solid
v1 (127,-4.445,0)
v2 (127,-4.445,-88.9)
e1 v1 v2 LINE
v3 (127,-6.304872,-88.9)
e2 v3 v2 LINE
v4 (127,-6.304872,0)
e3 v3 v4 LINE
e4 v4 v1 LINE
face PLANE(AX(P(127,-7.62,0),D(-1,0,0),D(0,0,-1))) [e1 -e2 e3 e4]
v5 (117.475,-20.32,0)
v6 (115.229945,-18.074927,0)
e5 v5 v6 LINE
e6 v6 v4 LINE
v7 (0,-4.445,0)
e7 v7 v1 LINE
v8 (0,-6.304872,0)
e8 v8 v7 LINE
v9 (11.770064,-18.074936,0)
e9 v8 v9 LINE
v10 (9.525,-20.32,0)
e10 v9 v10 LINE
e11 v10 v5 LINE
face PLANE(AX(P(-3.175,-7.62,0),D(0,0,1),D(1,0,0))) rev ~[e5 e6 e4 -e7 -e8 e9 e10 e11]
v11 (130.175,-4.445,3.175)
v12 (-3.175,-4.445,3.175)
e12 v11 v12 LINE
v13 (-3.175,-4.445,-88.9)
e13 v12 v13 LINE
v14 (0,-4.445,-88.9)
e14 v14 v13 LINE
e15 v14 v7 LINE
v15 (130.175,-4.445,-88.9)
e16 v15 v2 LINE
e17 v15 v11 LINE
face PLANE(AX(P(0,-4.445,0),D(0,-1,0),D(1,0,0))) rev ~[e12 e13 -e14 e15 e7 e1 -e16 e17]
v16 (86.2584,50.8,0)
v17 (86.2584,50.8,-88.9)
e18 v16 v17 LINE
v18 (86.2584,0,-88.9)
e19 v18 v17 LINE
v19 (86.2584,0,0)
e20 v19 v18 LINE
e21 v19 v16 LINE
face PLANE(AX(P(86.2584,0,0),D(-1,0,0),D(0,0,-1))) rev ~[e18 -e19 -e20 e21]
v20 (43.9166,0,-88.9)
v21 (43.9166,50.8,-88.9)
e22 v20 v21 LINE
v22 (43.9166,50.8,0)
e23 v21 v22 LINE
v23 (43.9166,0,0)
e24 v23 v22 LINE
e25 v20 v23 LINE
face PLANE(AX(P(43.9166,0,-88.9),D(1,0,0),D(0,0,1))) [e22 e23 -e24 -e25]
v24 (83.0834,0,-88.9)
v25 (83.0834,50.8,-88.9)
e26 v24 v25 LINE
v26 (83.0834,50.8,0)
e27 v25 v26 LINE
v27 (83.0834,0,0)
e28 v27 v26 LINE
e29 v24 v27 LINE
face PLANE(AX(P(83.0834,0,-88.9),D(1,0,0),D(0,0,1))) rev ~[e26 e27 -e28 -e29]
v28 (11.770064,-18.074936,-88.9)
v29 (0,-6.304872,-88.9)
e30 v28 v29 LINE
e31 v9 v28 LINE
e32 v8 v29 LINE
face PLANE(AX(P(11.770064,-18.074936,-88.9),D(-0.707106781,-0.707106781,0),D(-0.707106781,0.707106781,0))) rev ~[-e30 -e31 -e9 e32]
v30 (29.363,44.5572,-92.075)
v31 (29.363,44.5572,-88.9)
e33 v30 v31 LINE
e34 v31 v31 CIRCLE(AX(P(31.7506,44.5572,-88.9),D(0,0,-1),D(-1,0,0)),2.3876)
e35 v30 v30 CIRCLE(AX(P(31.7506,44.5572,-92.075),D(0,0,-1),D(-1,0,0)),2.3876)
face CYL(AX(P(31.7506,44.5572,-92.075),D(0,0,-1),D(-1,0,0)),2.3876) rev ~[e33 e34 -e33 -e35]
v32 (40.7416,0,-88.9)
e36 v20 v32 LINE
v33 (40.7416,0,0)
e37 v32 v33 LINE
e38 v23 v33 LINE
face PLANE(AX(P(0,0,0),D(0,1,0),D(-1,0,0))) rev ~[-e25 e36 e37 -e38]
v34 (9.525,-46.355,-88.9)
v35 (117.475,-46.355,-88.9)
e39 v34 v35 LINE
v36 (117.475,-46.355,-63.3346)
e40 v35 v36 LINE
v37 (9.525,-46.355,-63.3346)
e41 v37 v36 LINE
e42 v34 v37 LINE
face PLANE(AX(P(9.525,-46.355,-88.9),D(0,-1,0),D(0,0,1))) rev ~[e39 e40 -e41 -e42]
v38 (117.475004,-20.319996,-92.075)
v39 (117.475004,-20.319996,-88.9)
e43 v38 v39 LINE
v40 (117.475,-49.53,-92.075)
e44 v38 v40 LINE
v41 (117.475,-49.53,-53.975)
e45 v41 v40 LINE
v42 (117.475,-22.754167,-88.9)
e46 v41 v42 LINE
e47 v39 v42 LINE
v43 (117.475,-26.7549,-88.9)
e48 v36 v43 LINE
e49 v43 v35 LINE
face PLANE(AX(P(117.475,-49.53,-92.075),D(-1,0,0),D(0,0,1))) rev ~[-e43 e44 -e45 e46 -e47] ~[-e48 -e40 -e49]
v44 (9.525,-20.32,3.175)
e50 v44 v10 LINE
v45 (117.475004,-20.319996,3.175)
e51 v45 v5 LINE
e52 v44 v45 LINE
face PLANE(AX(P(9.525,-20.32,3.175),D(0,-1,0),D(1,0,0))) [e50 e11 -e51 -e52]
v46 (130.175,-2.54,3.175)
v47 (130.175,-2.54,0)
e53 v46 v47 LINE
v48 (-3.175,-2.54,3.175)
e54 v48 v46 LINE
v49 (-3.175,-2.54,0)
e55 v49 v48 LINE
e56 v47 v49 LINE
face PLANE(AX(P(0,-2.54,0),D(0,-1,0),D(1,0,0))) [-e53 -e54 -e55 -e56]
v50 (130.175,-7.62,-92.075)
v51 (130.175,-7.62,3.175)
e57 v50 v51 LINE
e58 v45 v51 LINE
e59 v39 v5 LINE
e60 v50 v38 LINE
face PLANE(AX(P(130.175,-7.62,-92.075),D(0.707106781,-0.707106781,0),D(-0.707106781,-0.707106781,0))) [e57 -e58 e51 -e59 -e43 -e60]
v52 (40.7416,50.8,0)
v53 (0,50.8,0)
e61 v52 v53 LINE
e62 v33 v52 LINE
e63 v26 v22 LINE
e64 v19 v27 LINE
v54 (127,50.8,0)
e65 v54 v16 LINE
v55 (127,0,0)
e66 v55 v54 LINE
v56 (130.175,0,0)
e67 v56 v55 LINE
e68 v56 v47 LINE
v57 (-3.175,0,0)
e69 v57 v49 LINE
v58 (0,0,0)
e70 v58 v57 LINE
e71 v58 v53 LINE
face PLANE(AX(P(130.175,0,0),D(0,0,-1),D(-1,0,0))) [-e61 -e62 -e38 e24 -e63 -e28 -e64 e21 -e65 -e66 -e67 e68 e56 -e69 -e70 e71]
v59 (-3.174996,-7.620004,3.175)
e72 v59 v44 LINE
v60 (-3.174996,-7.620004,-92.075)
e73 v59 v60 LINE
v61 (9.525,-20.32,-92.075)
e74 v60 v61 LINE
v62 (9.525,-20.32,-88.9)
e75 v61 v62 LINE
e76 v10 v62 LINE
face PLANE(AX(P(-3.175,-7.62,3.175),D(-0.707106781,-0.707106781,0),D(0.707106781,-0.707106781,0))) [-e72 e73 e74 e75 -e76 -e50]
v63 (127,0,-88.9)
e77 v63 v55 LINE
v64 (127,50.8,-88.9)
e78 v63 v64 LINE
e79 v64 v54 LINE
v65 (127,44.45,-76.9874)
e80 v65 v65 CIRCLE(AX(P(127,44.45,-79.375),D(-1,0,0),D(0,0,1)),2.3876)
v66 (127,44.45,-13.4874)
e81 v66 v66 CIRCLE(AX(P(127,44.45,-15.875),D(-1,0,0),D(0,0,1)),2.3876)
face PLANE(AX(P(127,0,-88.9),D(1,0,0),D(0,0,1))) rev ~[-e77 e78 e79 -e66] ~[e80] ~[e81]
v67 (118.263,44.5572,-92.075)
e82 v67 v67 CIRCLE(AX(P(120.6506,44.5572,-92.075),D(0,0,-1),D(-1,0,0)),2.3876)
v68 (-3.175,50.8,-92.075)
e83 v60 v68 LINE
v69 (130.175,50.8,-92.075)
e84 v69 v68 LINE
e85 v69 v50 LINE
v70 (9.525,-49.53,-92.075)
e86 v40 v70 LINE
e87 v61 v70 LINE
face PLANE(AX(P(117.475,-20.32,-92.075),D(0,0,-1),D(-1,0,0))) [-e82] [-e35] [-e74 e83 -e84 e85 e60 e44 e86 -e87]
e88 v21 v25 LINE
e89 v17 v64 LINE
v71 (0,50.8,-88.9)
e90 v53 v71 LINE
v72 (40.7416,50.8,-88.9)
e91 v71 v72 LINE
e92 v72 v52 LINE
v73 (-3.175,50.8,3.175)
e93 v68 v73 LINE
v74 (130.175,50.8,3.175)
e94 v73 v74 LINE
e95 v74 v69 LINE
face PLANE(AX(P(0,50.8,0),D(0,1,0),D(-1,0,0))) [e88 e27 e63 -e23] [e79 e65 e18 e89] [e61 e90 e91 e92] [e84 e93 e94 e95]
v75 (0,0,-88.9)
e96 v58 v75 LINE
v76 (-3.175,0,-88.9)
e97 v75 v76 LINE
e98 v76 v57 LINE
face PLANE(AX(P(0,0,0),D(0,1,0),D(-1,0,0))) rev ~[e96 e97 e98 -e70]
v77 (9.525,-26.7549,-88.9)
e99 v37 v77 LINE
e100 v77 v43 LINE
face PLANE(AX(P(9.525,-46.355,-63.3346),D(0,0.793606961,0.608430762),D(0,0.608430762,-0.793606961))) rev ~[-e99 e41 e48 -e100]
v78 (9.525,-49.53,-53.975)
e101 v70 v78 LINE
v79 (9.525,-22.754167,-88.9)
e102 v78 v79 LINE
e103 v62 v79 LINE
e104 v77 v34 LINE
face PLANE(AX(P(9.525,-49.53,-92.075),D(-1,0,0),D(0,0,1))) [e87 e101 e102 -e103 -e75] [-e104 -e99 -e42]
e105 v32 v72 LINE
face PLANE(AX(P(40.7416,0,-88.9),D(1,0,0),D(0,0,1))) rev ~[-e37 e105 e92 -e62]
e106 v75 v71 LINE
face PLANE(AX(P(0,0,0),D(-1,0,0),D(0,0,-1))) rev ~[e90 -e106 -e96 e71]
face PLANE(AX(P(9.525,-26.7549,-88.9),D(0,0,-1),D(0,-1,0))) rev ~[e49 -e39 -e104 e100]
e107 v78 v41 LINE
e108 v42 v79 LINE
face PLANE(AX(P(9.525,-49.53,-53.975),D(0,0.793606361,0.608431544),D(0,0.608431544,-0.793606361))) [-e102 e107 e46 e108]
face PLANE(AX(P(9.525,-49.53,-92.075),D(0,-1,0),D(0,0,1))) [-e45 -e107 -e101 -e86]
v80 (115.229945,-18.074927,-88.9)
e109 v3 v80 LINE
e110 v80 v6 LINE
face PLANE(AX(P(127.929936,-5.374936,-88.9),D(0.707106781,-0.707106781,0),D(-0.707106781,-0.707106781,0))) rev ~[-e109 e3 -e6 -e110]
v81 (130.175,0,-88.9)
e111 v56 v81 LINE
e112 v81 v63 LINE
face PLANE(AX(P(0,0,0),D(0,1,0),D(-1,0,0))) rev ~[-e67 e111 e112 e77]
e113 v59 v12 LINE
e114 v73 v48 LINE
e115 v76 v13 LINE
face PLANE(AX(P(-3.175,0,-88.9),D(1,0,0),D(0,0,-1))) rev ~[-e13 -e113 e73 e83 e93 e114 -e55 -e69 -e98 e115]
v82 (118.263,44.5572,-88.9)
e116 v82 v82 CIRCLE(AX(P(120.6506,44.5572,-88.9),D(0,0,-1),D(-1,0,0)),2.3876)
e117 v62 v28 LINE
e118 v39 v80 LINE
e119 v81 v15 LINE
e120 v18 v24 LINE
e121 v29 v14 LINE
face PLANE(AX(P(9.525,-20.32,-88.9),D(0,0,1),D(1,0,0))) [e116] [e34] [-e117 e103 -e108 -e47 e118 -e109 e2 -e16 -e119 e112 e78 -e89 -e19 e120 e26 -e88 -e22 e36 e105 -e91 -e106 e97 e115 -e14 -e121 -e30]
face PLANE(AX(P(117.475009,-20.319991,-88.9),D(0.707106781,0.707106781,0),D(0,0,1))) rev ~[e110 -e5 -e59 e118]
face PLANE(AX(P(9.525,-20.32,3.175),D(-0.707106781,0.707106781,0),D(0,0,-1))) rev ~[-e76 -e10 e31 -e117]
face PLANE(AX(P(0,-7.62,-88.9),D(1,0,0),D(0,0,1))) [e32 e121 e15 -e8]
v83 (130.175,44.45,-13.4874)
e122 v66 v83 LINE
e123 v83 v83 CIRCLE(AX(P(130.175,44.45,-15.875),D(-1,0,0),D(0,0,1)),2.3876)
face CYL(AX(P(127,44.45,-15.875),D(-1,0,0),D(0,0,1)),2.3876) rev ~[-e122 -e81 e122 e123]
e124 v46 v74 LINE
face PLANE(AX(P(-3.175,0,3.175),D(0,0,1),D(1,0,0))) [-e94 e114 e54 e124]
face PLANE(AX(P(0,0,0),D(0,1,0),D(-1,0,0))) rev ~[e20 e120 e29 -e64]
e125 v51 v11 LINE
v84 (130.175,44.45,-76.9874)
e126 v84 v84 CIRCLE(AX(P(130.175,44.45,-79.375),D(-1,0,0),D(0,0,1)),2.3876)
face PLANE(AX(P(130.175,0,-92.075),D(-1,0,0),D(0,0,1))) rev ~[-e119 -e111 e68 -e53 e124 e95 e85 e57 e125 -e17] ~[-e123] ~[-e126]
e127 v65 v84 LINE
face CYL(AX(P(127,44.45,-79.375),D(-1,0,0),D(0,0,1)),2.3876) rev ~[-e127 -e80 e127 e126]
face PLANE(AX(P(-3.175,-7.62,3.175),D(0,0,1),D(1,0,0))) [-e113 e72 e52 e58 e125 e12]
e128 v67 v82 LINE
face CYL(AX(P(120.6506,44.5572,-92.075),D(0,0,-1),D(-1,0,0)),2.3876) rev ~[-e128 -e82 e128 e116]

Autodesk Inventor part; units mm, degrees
ref_plane "YZ Plane" through (0, 0, 0) normal (1, 0, 0) x (0, 1, 0)
ref_plane "XZ Plane" through (0, 0, 0) normal (0, 1, 0) x (-1, 0, 0)
ref_plane "XY Plane" through (0, 0, 0) normal (0, 0, 1) x (1, 0, 0)
sketch "Sketch1" plane through (0, 0, 0) normal (0, 1, 0) x (-1, 0, 0)
  line L0 (0, 0) -> (0, -88.9)
  line L1 (0, -88.9) -> (-127, -88.9)
  line L2 (-127, -88.9) -> (-127, 0)
  line L3 (-127, 0) -> (0, 0)
  line L4 (3.175, -92.075) -> (3.175, 3.175)
  line L5 (3.175, 3.175) -> (-130.175, 3.175)
  line L6 (-130.175, 3.175) -> (-130.175, -92.075)
  line L7 (-130.175, -92.075) -> (3.175, -92.075)
  line L8 (0, 0) -> (0, -88.9)
  line L9 (0, -88.9) -> (-40.7416, -88.9)
  line L10 (-40.7416, -88.9) -> (-40.7416, 0)
  line L11 (-40.7416, 0) -> (0, 0)
  line L12 (-40.7416, 0) -> (-40.7416, -88.9)
  line L13 (-40.7416, -88.9) -> (-43.9166, -88.9)
  line L14 (-43.9166, -88.9) -> (-43.9166, 0)
  line L15 (-43.9166, 0) -> (-40.7416, 0)
  line L16 (-127, -88.9) -> (-127, 0)
  line L17 (-127, 0) -> (-86.2584, 0)
  line L18 (-86.2584, 0) -> (-86.2584, -88.9)
  line L19 (-86.2584, -88.9) -> (-127, -88.9)
  line L20 (-86.2584, 0) -> (-86.2584, -88.9)
  line L21 (-86.2584, -88.9) -> (-83.0834, -88.9)
  line L22 (-83.0834, -88.9) -> (-83.0834, 0)
  line L23 (-83.0834, 0) -> (-86.2584, 0)
  dimension "d0" = 88.9
  dimension "d1" = 127
  dimension "d2" = 3.175
  dimension "d3" = 40.7416
  dimension "d4" = 3.175
  dimension "d5" = 40.7416
  dimension "d6" = 3.175
extrude "Extrusion1" add sketch "Sketch1" along normal blind 50.8 contours L10 L1 L14 L3 | L22 L1 L18 L3 | L7 L6 L5 L4
sketch "Sketch2" plane through (0, 0, 0) normal (0, -1, 0) x (1, 0, 0)
  line L0 (-3.175, 3.175) -> (130.175, 3.175) projected
  line L1 (-3.175, 3.175) -> (130.175, 3.175)
  line L2 (130.175, 3.175) -> (130.175, 0)
  line L3 (130.175, 0) -> (-3.175, 0)
  line L4 (-3.175, 0) -> (-3.175, 3.175)
  point P0 (0, 0)
extrude "Extrusion2" add sketch "Sketch2" along normal blind 2.54
sketch "Sketch3" plane through (0, 0, 0) normal (0, -1, 0) x (1, 0, 0)
  line L0 (130.175, -92.075) -> (-3.175, -92.075) projected
  line L1 (-3.175, -92.075) -> (130.175, -92.075)
  line L2 (130.175, -92.075) -> (130.175, -88.9)
  line L3 (130.175, -88.9) -> (-3.175, -88.9)
  line L4 (-3.175, -88.9) -> (-3.175, -92.075)
  point P0 (0, 0)
  dimension "d11" = 3.175
extrude "Extrusion3" add sketch "Sketch3" along normal blind 7.62
sketch "Sketch4" plane through (0, -7.62, 0) normal (0, -1, 0) x (1, 0, 0)
  line L0 (130.175, -92.075) -> (-3.175, -92.075) projected
  line L1 (-3.175, -92.075) -> (130.175, -92.075)
  line L2 (130.175, -92.075) -> (130.175, 3.175)
  line L3 (130.175, 3.175) -> (-3.175, 3.175)
  line L4 (-3.175, 3.175) -> (-3.175, -92.075)
  line L5 (0, 0) -> (127, 0)
  line L6 (127, 0) -> (127, -88.9)
  line L7 (127, -88.9) -> (0, -88.9)
  line L8 (0, -88.9) -> (0, 0)
  point P0 (0, 0)
extrude "Extrusion4" add sketch "Sketch4" against normal blind 3.175
sketch "Sketch9" plane through (-3.175, -7.62, 3.175) normal (0, 0, 1) x (1, 0, 0)
  line L0 (0, 58.42) -> (0, 0) construction
  line L1 (0, 0) -> (0, -12.7) construction
  line L2 (0, -12.7) -> (0, 0) construction
  line L3 (0, -12.7) -> (12.7, -12.7) construction
  line L4 (0, 0) -> (133.35, 0) construction
  line L5 (133.35, 0) -> (133.35, -12.7) construction
  line L6 (133.35, -12.7) -> (120.65, -12.7) construction
  line L7 (0, 0) -> (12.7, -12.7)
  line L8 (12.7, -12.7) -> (120.65, -12.7)
  line L9 (120.65, -12.7) -> (133.35, 0)
  line L10 (0, 0) -> (133.35, 0)
  point P0 (3.175, 7.62)
  dimension "d28" = 12.7
  dimension "d29" = 12.7
  dimension "d30" = 90
  dimension "d31" = 12.7
  dimension "d32" = 12.7
extrude "Extrusion9" add sketch "Sketch9" against normal blind 3.175
sketch "Sketch10" plane through (130.175, 50.8, -92.075) normal (0, 0, -1) x (-1, 0, 0)
  line L0 (133.35, -58.42) -> (0, -58.42) projected
  line L1 (12.7, -71.12) -> (120.65, -71.12) projected
  line L2 (133.35, -58.42) -> (120.65, -71.12)
  line L3 (0, -58.42) -> (12.7, -71.12) projected
  line L4 (120.65, -71.12) -> (12.7, -71.12)
  line L5 (12.7, -71.12) -> (0, -58.42)
  line L6 (0, -58.42) -> (133.35, -58.42)
  point P0 (130.175, -50.8)
extrude "Extrusion10" add sketch "Sketch10" against normal blind 3.175
sketch "Sketch11" plane through (130.175, -7.62, -88.9) normal (0.7071068, -0.7071068, 0) x (-0.7071068, -0.7071068, 0)
  line L0 (0, 3.175) -> (0, 0) projected
  line L1 (17.9605, 3.175) -> (17.9605, 0) projected
  line L2 (0, 3.175) -> (17.9605, 3.175)
  line L3 (17.9605, 3.175) -> (17.9605, -92.075)
  line L4 (17.9605, -92.075) -> (0, -92.075)
  line L5 (0, -92.075) -> (0, 3.175)
  point P0 (86.6595, -88.9)
extrude "Extrusion11" add sketch "Sketch11" against normal blind 3.175
sketch "Sketch12" plane through (9.525, -20.32, -88.9) normal (-0.7071068, -0.7071068, 0) x (-0.7071068, 0.7071068, 0)
  line L0 (59.2697, 3.175) -> (17.9605, 3.175) projected
  line L1 (17.9605, -92.075) -> (0, -92.075) projected
  line L2 (17.9605, 3.175) -> (17.9605, -92.075)
  line L3 (17.9605, -92.075) -> (0, -92.075)
  line L4 (0, -92.075) -> (0, 3.175)
  line L5 (0, 3.175) -> (17.9605, 3.175)
  point P0 (21.1036, -88.9)
  point P1 (0, -92.075)
extrude "Extrusion12" add sketch "Sketch12" against normal blind 3.175
sketch "Sketch13" plane through (127, 0, -88.9) normal (-1, 0, 0) x (0, 0, 1)
  line L0 (0, 50.8) -> (9.525, 50.8) construction
  line L1 (0, 50.8) -> (88.9, 50.8) construction
  line L2 (9.525, 50.8) -> (9.525, 44.45) construction
  circle A0 centre (9.525, 44.45) radius 2.3876
  line L3 (9.525, 44.45) -> (73.025, 44.45) construction
  circle A1 centre (73.025, 44.45) radius 2.3876
  point P0 (88.9, 0)
  dimension "d46" = 9.525
  dimension "d47" = 6.35
  dimension "d48" = 4.7752
  dimension "d49" = 63.5
  dimension "d50" = 4.7752
extrude "Extrusion13" cut sketch "Sketch13" against normal blind 3.175
sketch "Sketch14" plane through (130.175, 50.8, -92.075) normal (0, 0, -1) x (-1, 0, 0)
  line L0 (0, -53.34) -> (0, 0) construction
  line L1 (0, 0) -> (0, -6.35) construction
  line L2 (0, -6.35) -> (9.5244, -6.2428) construction
  line L3 (9.5244, -6.2428) -> (98.4244, -6.2428) construction
  circle A0 centre (9.5244, -6.2428) radius 2.3876
  circle A1 centre (98.4244, -6.2428) radius 2.3876
  point P0 (130.175, -50.8)
  dimension "d51" = 6.35
  dimension "d52" = 9.525
  dimension "d53" = 88.9
  dimension "d54" = 4.7752
  dimension "d55" = 4.7752
extrude "Extrusion14" cut sketch "Sketch14" against normal blind 3.175
sketch "Sketch15" plane through (9.525, -20.32, -92.075) normal (0, -1, 0) x (1, 0, 0)
  line L0 (120.65, 0) -> (107.95, 0) projected
  line L1 (0, 3.175) -> (107.95, 3.175) projected
  line L2 (107.95, 0) -> (0, 0)
  line L3 (0, 0) -> (0, 3.175)
  line L4 (0, 3.175) -> (107.95, 3.175)
  line L5 (107.95, 3.175) -> (107.95, 0)
  point P0 (-9.525, 92.075)
extrude "Extrusion15" add sketch "Sketch15" along normal blind 29.21
sketch "Sketch16" plane through (9.525, -49.53, -92.075) normal (-1, 0, 0) x (0, 0, 1)
  line L0 (0, 29.21) -> (0, 0) projected
  line L1 (0, 0) -> (38.1, 0)
  line L2 (38.1, 0) -> (0, 29.21)
  line L3 (3.175, 22.7751) -> (3.175, 3.175)
  line L4 (3.175, 3.175) -> (28.7404, 3.175)
  line L5 (28.7404, 3.175) -> (3.175, 22.7751)
  point P0 (92.075, 49.53)
  dimension "d60" = 38.1
  dimension "d61" = 3.175
extrude "Extrusion16" add sketch "Sketch16" against normal blind 107.95
properties part number "BeadCompartments_5"
